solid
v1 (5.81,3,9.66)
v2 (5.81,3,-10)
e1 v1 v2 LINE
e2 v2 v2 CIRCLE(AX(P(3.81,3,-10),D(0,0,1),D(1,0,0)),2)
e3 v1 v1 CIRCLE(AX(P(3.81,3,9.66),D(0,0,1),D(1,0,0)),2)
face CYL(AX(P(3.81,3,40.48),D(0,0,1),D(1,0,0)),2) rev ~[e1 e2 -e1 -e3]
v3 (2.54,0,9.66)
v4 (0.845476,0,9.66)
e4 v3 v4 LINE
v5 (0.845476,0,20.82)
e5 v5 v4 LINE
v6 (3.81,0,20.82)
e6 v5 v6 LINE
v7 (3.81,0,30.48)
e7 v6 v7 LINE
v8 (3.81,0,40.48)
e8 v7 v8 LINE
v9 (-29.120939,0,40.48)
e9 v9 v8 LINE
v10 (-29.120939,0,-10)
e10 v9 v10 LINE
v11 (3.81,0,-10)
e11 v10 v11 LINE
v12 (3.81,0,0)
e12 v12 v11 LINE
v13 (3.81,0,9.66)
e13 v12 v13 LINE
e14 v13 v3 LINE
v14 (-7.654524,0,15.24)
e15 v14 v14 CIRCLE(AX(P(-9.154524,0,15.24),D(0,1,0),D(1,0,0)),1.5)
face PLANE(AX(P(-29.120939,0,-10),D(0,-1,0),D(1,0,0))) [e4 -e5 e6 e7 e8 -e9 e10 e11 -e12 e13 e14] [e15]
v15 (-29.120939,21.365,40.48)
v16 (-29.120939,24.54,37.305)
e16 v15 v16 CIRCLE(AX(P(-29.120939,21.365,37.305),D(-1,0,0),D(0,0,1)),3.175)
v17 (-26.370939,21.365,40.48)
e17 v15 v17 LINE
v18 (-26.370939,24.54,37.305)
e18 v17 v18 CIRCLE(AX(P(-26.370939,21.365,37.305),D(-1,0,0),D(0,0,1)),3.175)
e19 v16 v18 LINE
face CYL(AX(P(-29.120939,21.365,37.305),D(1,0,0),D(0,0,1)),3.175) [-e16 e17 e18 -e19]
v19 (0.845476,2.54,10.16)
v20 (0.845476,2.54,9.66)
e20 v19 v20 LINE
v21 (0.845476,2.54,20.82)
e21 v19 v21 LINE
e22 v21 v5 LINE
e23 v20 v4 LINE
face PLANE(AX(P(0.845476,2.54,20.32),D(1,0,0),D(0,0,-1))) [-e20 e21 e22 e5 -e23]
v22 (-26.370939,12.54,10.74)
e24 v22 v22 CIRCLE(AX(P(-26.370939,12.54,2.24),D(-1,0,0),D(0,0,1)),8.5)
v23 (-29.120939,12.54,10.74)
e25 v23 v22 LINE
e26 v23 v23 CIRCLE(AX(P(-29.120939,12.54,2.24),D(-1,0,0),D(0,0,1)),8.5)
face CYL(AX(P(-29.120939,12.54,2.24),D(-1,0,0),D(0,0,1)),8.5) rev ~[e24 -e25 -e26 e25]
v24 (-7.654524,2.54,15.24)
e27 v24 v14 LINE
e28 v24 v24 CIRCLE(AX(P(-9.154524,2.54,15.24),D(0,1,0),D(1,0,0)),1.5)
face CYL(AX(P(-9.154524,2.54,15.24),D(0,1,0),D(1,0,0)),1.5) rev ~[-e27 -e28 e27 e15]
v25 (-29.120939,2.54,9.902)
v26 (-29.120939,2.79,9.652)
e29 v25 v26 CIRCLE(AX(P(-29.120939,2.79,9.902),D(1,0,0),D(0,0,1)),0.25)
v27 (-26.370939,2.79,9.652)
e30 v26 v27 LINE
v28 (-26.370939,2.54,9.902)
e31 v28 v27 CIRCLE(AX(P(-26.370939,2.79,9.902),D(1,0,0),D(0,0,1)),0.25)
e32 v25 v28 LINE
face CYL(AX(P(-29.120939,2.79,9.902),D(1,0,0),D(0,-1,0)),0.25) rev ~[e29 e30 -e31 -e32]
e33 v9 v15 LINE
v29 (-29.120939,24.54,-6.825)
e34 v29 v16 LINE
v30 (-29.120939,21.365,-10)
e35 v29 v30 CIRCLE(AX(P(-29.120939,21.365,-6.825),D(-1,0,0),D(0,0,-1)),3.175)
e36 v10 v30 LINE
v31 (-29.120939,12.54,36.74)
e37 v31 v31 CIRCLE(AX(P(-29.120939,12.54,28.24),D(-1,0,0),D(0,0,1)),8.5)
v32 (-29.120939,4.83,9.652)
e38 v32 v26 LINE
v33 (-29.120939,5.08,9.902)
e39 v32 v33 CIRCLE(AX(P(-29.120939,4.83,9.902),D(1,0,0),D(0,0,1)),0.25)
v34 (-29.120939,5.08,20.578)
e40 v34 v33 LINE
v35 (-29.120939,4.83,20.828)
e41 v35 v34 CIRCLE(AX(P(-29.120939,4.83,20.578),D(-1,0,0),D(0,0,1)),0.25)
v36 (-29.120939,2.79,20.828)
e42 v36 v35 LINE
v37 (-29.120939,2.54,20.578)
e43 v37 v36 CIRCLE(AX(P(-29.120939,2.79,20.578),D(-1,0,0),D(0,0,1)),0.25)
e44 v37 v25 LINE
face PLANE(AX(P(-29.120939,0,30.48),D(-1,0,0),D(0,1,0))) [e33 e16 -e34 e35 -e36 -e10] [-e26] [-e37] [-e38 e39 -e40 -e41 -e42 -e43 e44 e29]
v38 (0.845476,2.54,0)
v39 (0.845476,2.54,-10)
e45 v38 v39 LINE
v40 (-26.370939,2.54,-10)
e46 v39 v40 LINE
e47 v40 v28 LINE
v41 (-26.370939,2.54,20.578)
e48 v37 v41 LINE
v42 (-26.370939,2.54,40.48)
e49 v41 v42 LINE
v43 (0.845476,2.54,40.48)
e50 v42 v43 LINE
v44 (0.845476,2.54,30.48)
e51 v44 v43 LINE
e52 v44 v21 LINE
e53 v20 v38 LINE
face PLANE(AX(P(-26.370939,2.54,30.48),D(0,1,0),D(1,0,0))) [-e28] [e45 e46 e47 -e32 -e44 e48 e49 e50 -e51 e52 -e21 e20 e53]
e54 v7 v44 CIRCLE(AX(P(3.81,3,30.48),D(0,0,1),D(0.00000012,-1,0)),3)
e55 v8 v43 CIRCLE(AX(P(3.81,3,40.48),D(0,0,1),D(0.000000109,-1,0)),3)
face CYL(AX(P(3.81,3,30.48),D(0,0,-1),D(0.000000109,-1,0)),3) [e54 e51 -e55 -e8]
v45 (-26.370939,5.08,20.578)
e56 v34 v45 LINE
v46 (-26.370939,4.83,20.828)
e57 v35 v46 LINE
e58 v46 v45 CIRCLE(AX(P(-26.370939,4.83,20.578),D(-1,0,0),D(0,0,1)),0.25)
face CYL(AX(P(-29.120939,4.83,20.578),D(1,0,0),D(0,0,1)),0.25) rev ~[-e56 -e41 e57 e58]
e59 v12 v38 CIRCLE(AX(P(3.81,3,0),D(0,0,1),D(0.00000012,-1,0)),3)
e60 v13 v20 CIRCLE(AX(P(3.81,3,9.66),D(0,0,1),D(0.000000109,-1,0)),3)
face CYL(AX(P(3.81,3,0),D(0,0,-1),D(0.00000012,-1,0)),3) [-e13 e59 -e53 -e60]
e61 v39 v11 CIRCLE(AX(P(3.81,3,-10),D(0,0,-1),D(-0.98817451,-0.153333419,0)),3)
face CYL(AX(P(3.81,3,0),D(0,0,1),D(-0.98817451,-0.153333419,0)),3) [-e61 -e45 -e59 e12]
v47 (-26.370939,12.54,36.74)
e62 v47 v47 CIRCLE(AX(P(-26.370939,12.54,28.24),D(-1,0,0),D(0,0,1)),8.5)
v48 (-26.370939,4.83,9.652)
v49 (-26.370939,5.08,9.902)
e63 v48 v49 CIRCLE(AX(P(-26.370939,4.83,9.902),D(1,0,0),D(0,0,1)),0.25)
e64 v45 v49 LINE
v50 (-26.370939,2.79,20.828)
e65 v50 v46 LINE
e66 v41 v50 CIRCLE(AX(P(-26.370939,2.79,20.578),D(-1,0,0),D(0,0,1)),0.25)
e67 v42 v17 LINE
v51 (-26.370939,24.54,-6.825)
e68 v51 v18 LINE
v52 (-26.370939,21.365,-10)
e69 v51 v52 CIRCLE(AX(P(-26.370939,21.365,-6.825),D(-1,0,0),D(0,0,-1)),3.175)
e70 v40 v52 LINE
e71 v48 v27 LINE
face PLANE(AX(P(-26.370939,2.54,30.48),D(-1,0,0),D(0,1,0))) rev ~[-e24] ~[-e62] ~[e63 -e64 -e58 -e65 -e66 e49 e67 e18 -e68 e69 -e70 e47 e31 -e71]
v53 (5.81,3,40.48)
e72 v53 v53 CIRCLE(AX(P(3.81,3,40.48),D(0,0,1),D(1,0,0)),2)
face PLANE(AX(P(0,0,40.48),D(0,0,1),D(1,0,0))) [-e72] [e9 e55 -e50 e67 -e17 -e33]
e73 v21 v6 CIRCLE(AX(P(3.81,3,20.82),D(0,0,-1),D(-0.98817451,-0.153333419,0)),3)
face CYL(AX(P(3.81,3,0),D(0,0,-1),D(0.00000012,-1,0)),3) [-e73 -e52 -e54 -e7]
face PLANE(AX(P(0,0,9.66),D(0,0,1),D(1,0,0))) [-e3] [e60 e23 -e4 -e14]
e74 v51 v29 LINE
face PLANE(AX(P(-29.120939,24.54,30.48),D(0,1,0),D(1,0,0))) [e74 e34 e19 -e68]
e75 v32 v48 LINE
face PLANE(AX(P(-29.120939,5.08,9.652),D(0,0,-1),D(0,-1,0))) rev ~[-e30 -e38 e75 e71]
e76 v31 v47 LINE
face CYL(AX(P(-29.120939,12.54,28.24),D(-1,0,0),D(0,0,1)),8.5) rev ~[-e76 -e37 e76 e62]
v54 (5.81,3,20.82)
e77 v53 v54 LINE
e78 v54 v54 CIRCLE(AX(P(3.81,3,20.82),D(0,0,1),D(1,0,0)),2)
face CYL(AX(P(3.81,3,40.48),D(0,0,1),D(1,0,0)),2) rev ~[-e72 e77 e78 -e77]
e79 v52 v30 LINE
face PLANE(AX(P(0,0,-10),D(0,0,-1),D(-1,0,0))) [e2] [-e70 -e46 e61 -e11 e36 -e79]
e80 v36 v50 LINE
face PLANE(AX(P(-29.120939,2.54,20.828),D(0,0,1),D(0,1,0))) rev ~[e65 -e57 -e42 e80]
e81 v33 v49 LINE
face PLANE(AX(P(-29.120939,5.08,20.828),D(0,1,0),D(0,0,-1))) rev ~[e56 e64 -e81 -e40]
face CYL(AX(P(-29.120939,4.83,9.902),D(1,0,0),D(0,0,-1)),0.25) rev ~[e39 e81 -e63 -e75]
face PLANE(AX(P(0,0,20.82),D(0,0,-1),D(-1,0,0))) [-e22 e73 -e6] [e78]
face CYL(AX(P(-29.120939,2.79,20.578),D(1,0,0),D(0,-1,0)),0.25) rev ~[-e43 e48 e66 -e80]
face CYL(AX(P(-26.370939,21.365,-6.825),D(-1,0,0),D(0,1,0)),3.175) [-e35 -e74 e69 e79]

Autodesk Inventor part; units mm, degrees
ref_plane "YZ Plane" through (0, 0, 0) normal (1, 0, 0) x (0, 1, 0)
ref_plane "XZ Plane" through (0, 0, 0) normal (0, 1, 0) x (-1, 0, 0)
ref_plane "XY Plane" through (0, 0, 0) normal (0, 0, 1) x (1, 0, 0)
sketch "Sketch1" plane through (0, 0, 0) normal (0, 0, 1) x (1, 0, 0)
  line L0 (0, 0) -> (3.81, 0)
  line L1 (0, 0) -> (0, 1.27)
  arc A0 (3.81, 0) -> (1.359061, 1.27) centre (3.81, 3) ccw
  circle A1 centre (3.81, 3) radius 1.9
  line L2 (0, 1.27) -> (1.359061, 1.27)
  dimension "d0" = 3.81
  dimension "d1" = 1.27
  dimension "d2" = 6
  dimension "d3" = 3.8
extrude "Extrusion1" add sketch "Sketch1" along normal blind 30.48
ref_plane "Work Plane1" through (0, 0, 20.32) normal (0, 0, 1) x (1, 0, 0)
sketch "Sketch2" plane through (0, 0, 20.32) normal (0, 0, 1) x (1, 0, 0)
  arc A0 (3.81, 0) -> (1.359061, 1.27) centre (3.81, 3) ccw
  line L0 (2.54, 1.27) -> (2.54, 0)
  line L1 (0, 0) -> (3.81, 0)
  line L2 (2.54, 0) -> (3.81, 0)
  circle A1 centre (3.81, 3) radius 0.762
sketch "Sketch2 outline for Extrusion2" plane through (0, 0, 20.32) normal (0, 0, 1) x (1, 0, 0)
  line L0 (2.54, 0) -> (3.81, 0)
  line L1 (1.359061, 1.27) -> (2.54, 0)
  arc A0 (3.81, 0) -> (1.359061, 1.27) centre (3.81, 3) ccw
  circle A1 centre (3.81, 3) radius 0.762
extrude "Extrusion2" cut sketch "Sketch2 outline for Extrusion2" against normal blind 10.16
sketch "Sketch3" plane through (0, 1.27, 0) normal (0, 1, 0) x (1, 0, 0)
  line L0 (0, 0) -> (3.81, 0)
  line L1 (0, 0) -> (2.531995, 0)
  line L2 (2.531995, 0) -> (-25.408005, 0)
  line L3 (-25.408005, 0) -> (-25.408005, -27.94)
  line L4 (-25.408005, -27.94) -> (2.531995, -27.94)
  line L5 (1.359061, 0) -> (1.359061, -10.16)
  line L6 (1.359061, 0) -> (1.359061, -1.27)
  line L7 (1.359061, -1.27) -> (-25.310939, -1.27)
  line L8 (1.359061, -20.32) -> (1.359061, -30.48)
  line L9 (1.359061, -30.48) -> (1.359061, -29.21)
  line L10 (1.359061, -29.21) -> (-25.310939, -29.21)
  line L11 (-25.310939, -29.21) -> (-25.310939, -1.27)
  line L12 (0.085059, -1.27) -> (0.085059, -29.21)
  line L13 (0, 0) -> (0, -30.48)
  line L14 (0, -1.27) -> (0, -29.21)
  line L15 (1.359061, -29.21) -> (1.359061, -30.48)
  line L16 (1.359061, 0) -> (1.359061, -1.27)
  line L17 (1.359061, -30.48) -> (1.359061, -29.21)
  line L18 (1.359061, -30.48) -> (6.81, -30.48)
  line L19 (1.359061, -30.48) -> (-1.399798, -27.94)
  line L20 (1.359061, -30.48) -> (1.359061, -29.21)
  line L21 (1.359061, -29.21) -> (-1.466488, -29.21)
  point P0 (3.81, -30.48)
  dimension "d9" = 27.94
  dimension "d10" = 27.94
  dimension "d11" = 27.94
  dimension "d12" = 1.27
  dimension "d13" = 26.67
  dimension "d14" = 1.27
  dimension "d15" = 26.67
extrude "Extrusion3" cut sketch "Sketch3" against normal blind 25.4 contours L7 L12 L4 L13 | L4 L12 L10 L13
sketch "Sketch4" plane through (0, 0, 0) normal (0, -1, 0) x (1, 0, 0)
  line L0 (1.359061, 0) -> (1.359061, 10.16)
  line L1 (1.359061, 0) -> (-29.120939, 0)
  line L2 (-29.120939, 0) -> (-29.120939, 30.48)
  line L3 (-29.120939, 30.48) -> (1.359061, 30.48)
  line L4 (1.359061, 30.48) -> (1.359061, 0)
  line L5 (0, 1.27) -> (0.085059, 1.27)
  line L6 (0.085059, 1.27) -> (-27.854941, 1.27)
  line L7 (-27.854941, 1.27) -> (-27.854941, 29.21)
  line L8 (-27.854941, 29.21) -> (0.085059, 29.21)
  line L9 (0.085059, 29.21) -> (0.085059, 1.27)
  point P0 (0, 0)
  dimension "d18" = 30.48
  dimension "d19" = 30.48
  dimension "d20" = 30.48
  dimension "d21" = 27.94
  dimension "d22" = 27.94
  dimension "d23" = 27.94
sketch "Sketch5" plane through (0, 1.27, 0) normal (0, 1, 0) x (1, 0, 0)
  line L0 (1.359061, 0) -> (0, 0)
  line L1 (1.359061, 0) -> (0, 0)
  line L2 (0, 0) -> (0, -1.27)
  line L3 (0, 0) -> (0, -1.27)
  line L4 (0, -1.27) -> (1.359061, -1.27)
  line L5 (1.359061, 0) -> (1.359061, -10.16)
  line L6 (0, -29.21) -> (0, -30.48)
  line L7 (0, -29.21) -> (2.54, -29.21)
  line L8 (2.54, -29.21) -> (2.54, -30.48)
  line L9 (2.54, -30.48) -> (0, -30.48)
  line L10 (0, -30.48) -> (0, -29.21)
extrude "Extrusion4" cut sketch "Sketch5" against normal blind 25.4
sketch "Sketch6" plane through (1.359061, 1.27, 20.32) normal (0, 1, 0) x (1, 0, 0)
  line L0 (0, 19.05) -> (0, 10.16)
  line L1 (0, 0) -> (0, 10.16)
  line L2 (0, 19.05) -> (0, -8.89)
  line L3 (-1.274003, -8.89) -> (-1.274003, 19.05)
  line L4 (0, -8.89) -> (-1.274003, -8.89)
  line L5 (-1.274003, -8.89) -> (-1.274003, 19.05)
  line L6 (-1.274003, 19.05) -> (0, 19.05)
  point P0 (-1.359061, 20.32)
extrude "Extrusion5" cut sketch "Sketch6" against normal blind 25.4
extrude "Extrusion6" add sketch "Sketch4" against normal blind 1.27
sketch "Sketch7" plane through (0, 1.27, 0) normal (0, 1, 0) x (1, 0, 0)
  line L0 (1.359061, -29.21) -> (1.359061, -30.48)
  line L1 (-29.120939, 0) -> (-29.120939, -30.48)
  line L2 (2.54, 0) -> (-29.120939, 0)
  line L3 (-29.120939, 0) -> (-29.120939, -30.48)
  line L4 (-29.120939, -30.48) -> (2.54, -30.48)
  line L5 (2.54, -30.48) -> (2.54, 0)
  point P0 (0, 0)
  point P1 (2.54, -9.31335)
extrude "Extrusion7" add sketch "Sketch7" along normal blind 1.27
sketch "Sketch8" plane through (0, 2.54, 0) normal (0, 1, 0) x (1, 0, 0)
  line L0 (-22.120939, 7.26) -> (-22.120939, -37.74)
  line L1 (-29.120939, 0) -> (-29.120939, -30.48)
  line L2 (-29.120939, 0) -> (-29.120939, -30.48)
  line L3 (-29.120939, 0) -> (-26.370939, 0)
  line L4 (-26.370939, 0) -> (-26.370939, -30.48)
  line L5 (-26.370939, -30.48) -> (-29.120939, -30.48)
  line L6 (-29.120939, -30.48) -> (-29.120939, 0)
  point P0 (0, 0)
  dimension "d32" = 2.75
extrude "Extrusion8" add sketch "Sketch8" along normal blind 22
sketch "Sketch9" plane through (0, 0, 0) normal (0, 0, -1) x (-1, 0, 0)
  arc A0 (-0.845476, 2.54) -> (-3.81, 0) centre (-3.81, 3) ccw
  line L0 (29.120939, 0) -> (-3.81, 0)
  line L1 (29.120939, 0) -> (29.120939, 24.54)
  line L2 (26.370939, 24.54) -> (29.120939, 24.54)
  line L3 (26.370939, 2.54) -> (26.370939, 24.54)
  line L4 (-0.845476, 2.54) -> (26.370939, 2.54)
  line L5 (-2.54, 1.586812) -> (-2.54, 2.54)
  arc A1 (-1.966525, 2.54) -> (-2.54, 1.586812) centre (-3.81, 3) ccw
  line L6 (-2.54, 2.54) -> (-1.966525, 2.54)
  point P0 (0, 0)
extrude "Extrusion9" add sketch "Sketch9" along normal blind 10
sketch "Sketch10" plane through (0, 0, 30.48) normal (0, 0, 1) x (1, 0, 0)
  line L0 (0.085059, 1.27) -> (-27.854941, 1.27)
  line L1 (-26.370939, 2.54) -> (2.54, 2.54)
  line L2 (2.54, 0) -> (3.81, 0)
  arc A0 (3.81, 0) -> (0.845476, 2.54) centre (3.81, 3) ccw
  line L3 (2.54, 1.586812) -> (2.54, 2.54)
  line L4 (1.966525, 2.54) -> (2.54, 2.54)
  line L5 (-26.370939, 2.54) -> (-26.370939, 24.54)
  line L6 (-29.120939, 24.54) -> (-26.370939, 24.54)
  line L7 (-29.120939, 0) -> (-29.120939, 24.54)
  arc A1 (2.54, 1.586812) -> (1.966525, 2.54) centre (3.81, 3) ccw
  line L8 (1.359061, 1.27) -> (2.54, 1.27)
  line L9 (2.54, 1.27) -> (2.54, 0)
  line L10 (-26.370939, 2.54) -> (0.845476, 2.54)
  line L11 (-29.120939, 0) -> (1.359061, 0)
  line L12 (1.359061, 0) -> (1.359061, 1.27)
  point P0 (0, 0)
extrude "Extrusion10" add sketch "Sketch10" along normal blind 10
fillet "Fillet1" radius 3.175 2 edges at (-27.7459, 24.54, -10) (-27.7459, 24.54, 40.48)
sketch "Sketch12" plane through (0, 0, 40.48) normal (0, 0, 1) x (1, 0, 0)
  line L0 (2.54, 1.27) -> (2.54, 0)
  line L1 (1.359061, 1.27) -> (2.54, 1.27)
  line L2 (1.359061, 1.27) -> (1.359061, 0)
  line L3 (2.54, 0) -> (1.359061, 0)
  line L4 (2.54, 1.27) -> (2.54, 0)
  line L5 (2.54, 1.27) -> (1.359061, 1.27)
  point P0 (0, 0)
extrude "Extrusion12" add sketch "Sketch12" against normal blind 12
sketch "Sketch13" plane through (0, 0, 40.48) normal (0, 0, 1) x (1, 0, 0)
  arc A0 (2.54, 1.586812) -> (1.966525, 2.54) centre (3.81, 3) ccw
  circle A1 centre (3.81, 3) radius 2
  point P0 (0, 0)
extrude "Extrusion13" cut sketch "Sketch13" against normal blind 5054.6
sketch "Sketch14" plane through (0, 0, 20.32) normal (0, 0, -1) x (-1, 0, 0)
  arc A0 (-1.863619, 2.54) -> (-2.54, 1.454976) centre (-3.81, 3) ccw
  line L0 (-1.863619, 2.54) -> (-0.845476, 2.54)
  arc A1 (-0.845476, 2.54) -> (-3.81, 0) centre (-3.81, 3) ccw
  line L1 (-2.54, 0) -> (-3.81, 0)
  line L2 (-1.359061, 1.27) -> (-2.54, 0)
  line L3 (-1.359061, 1.27) -> (-2.54, 1.27)
  line L4 (-2.54, 1.27) -> (-2.54, 1.454976)
  line L5 (-2.54, 1.27) -> (-2.54, 0)
  line L6 (-2.54, 1.27) -> (-1.359061, 1.27)
  line L7 (-0.845476, 2.54) -> (26.370939, 2.54)
  line L8 (-1.359061, 1.27) -> (-2.54, 0)
  point P0 (0, 0)
extrude "Extrusion14" add sketch "Sketch14" along normal blind 15 contours L3 L2 L5
sketch "Sketch15" plane through (0, 2.54, 0) normal (0, 1, 0) x (1, 0, 0)
  line L0 (0.845476, 10) -> (0.845476, -10.16)
  line L1 (1.81, -40.48) -> (1.81, 10)
  line L2 (0.845476, -10.16) -> (1.81, -10.16)
  line L3 (1.81, -10.16) -> (1.81, -20.32)
  line L4 (1.81, -20.32) -> (0.845476, -20.32)
  line L5 (0.845476, -20.32) -> (0.845476, -10.16)
  line L6 (0.845476, -10.16) -> (12.384081, -10.16)
  line L7 (12.384081, -10.16) -> (12.384081, -20.32)
  line L8 (12.384081, -20.32) -> (0.845476, -20.32)
  line L9 (0.845476, -20.32) -> (0.845476, -10.16)
  point P0 (0, 0)
extrude "Extrusion15" cut sketch "Sketch15" against normal blind 15
sketch "Sketch16" plane through (-29.120939, 0, -10) normal (-1, 0, 0) x (0, 0, 1)
  circle A0 centre (12.24, 12.54) radius 8 projected
  circle A1 centre (38.24, 12.54) radius 8 projected
  circle A2 centre (12.24, 12.54) radius 8.5
  circle A3 centre (38.24, 12.54) radius 8.5
  point P0 (10, 0)
  dimension "d54" = 17
  dimension "d55" = 17
extrude "Extrusion16" cut sketch "Sketch16" against normal blind 25.4 contours A0 | A1 | A2 | A3
sketch "Sketch17" plane through (0, 0, 10.16) normal (0, 0, 1) x (1, 0, 0)
  line L0 (3.81, 0) -> (0.845476, 0)
  arc A0 (3.81, 0) -> (0.845476, 2.54) centre (3.81, 3) ccw
  line L1 (0.845476, 2.54) -> (0.845476, 0)
  circle A1 centre (3.81, 3) radius 2
  point P0 (0, 0)
extrude "Extrusion17" cut sketch "Sketch17" against normal blind 0.5
sketch "Sketch18" plane through (0, 0, 20.32) normal (0, 0, -1) x (-1, 0, 0)
  circle A0 centre (-3.81, 3) radius 2
  line L0 (-0.845476, 0) -> (-3.81, 0)
  line L1 (-0.845476, 2.54) -> (-0.845476, 0)
  arc A1 (-0.845476, 2.54) -> (-3.81, 0) centre (-3.81, 3) ccw
  point P0 (0, 0)
extrude "Extrusion18" cut sketch "Sketch18" against normal blind 0.5
sketch "Sketch19" plane through (-29.120939, 0, -10) normal (0, -1, 0) x (1, 0, 0)
  line L0 (29.205997, 11.27) -> (1.265997, 11.27)
  line L1 (1.265997, 11.27) -> (1.265997, 39.21)
  line L2 (1.265997, 39.21) -> (29.205997, 39.21)
  line L3 (29.205997, 39.21) -> (29.205997, 11.27)
  point P0 (29.120939, 10)
extrude "Extrusion19" add sketch "Sketch19" against normal blind 2.032
sketch "Sketch20" plane through (-29.120939, 0, -10) normal (-1, 0, 0) x (0, 0, 1)
  line L0 (0, 2.54) -> (50.48, 2.54) projected
  line L1 (25.24, 2.54) -> (30.828, 2.54)
  line L2 (30.828, 2.54) -> (19.652, 2.54)
  line L3 (19.652, 2.54) -> (30.828, 2.54)
  line L4 (30.828, 2.54) -> (30.828, 5.08)
  line L5 (30.828, 5.08) -> (19.652, 5.08)
  line L6 (19.652, 5.08) -> (19.652, 2.54)
  point P0 (10, 0)
  dimension "d64" = 5.588
  dimension "d65" = 11.176
  dimension "d66" = 2.54
extrude "Extrusion20" cut sketch "Sketch20" against normal blind 25.4
fillet "Fillet2" radius 0.25 4 edges at (-27.7459, 5.08, 9.652) (-27.7459, 2.54, 9.652) (-27.7459, 2.54, 20.828) (-27.7459, 5.08, 20.828)
sketch "Sketch21" plane through (0, 2.54, 0) normal (0, 1, 0) x (1, 0, 0)
  line L0 (0.845476, -9.66) -> (0.845476, -20.82)
  line L1 (0.845476, -15.24) -> (-4.154524, -15.24)
  line L2 (-4.154524, -15.24) -> (-9.154524, -15.24)
  circle A0 centre (-9.154524, -15.24) radius 1.5
  point P0 (0, 0)
  dimension "d70" = 5
  dimension "d71" = 5
  dimension "d72" = 3
extrude "Extrusion21" cut sketch "Sketch21" against normal blind 25.4
properties part number "Lid, Explosion Button"
